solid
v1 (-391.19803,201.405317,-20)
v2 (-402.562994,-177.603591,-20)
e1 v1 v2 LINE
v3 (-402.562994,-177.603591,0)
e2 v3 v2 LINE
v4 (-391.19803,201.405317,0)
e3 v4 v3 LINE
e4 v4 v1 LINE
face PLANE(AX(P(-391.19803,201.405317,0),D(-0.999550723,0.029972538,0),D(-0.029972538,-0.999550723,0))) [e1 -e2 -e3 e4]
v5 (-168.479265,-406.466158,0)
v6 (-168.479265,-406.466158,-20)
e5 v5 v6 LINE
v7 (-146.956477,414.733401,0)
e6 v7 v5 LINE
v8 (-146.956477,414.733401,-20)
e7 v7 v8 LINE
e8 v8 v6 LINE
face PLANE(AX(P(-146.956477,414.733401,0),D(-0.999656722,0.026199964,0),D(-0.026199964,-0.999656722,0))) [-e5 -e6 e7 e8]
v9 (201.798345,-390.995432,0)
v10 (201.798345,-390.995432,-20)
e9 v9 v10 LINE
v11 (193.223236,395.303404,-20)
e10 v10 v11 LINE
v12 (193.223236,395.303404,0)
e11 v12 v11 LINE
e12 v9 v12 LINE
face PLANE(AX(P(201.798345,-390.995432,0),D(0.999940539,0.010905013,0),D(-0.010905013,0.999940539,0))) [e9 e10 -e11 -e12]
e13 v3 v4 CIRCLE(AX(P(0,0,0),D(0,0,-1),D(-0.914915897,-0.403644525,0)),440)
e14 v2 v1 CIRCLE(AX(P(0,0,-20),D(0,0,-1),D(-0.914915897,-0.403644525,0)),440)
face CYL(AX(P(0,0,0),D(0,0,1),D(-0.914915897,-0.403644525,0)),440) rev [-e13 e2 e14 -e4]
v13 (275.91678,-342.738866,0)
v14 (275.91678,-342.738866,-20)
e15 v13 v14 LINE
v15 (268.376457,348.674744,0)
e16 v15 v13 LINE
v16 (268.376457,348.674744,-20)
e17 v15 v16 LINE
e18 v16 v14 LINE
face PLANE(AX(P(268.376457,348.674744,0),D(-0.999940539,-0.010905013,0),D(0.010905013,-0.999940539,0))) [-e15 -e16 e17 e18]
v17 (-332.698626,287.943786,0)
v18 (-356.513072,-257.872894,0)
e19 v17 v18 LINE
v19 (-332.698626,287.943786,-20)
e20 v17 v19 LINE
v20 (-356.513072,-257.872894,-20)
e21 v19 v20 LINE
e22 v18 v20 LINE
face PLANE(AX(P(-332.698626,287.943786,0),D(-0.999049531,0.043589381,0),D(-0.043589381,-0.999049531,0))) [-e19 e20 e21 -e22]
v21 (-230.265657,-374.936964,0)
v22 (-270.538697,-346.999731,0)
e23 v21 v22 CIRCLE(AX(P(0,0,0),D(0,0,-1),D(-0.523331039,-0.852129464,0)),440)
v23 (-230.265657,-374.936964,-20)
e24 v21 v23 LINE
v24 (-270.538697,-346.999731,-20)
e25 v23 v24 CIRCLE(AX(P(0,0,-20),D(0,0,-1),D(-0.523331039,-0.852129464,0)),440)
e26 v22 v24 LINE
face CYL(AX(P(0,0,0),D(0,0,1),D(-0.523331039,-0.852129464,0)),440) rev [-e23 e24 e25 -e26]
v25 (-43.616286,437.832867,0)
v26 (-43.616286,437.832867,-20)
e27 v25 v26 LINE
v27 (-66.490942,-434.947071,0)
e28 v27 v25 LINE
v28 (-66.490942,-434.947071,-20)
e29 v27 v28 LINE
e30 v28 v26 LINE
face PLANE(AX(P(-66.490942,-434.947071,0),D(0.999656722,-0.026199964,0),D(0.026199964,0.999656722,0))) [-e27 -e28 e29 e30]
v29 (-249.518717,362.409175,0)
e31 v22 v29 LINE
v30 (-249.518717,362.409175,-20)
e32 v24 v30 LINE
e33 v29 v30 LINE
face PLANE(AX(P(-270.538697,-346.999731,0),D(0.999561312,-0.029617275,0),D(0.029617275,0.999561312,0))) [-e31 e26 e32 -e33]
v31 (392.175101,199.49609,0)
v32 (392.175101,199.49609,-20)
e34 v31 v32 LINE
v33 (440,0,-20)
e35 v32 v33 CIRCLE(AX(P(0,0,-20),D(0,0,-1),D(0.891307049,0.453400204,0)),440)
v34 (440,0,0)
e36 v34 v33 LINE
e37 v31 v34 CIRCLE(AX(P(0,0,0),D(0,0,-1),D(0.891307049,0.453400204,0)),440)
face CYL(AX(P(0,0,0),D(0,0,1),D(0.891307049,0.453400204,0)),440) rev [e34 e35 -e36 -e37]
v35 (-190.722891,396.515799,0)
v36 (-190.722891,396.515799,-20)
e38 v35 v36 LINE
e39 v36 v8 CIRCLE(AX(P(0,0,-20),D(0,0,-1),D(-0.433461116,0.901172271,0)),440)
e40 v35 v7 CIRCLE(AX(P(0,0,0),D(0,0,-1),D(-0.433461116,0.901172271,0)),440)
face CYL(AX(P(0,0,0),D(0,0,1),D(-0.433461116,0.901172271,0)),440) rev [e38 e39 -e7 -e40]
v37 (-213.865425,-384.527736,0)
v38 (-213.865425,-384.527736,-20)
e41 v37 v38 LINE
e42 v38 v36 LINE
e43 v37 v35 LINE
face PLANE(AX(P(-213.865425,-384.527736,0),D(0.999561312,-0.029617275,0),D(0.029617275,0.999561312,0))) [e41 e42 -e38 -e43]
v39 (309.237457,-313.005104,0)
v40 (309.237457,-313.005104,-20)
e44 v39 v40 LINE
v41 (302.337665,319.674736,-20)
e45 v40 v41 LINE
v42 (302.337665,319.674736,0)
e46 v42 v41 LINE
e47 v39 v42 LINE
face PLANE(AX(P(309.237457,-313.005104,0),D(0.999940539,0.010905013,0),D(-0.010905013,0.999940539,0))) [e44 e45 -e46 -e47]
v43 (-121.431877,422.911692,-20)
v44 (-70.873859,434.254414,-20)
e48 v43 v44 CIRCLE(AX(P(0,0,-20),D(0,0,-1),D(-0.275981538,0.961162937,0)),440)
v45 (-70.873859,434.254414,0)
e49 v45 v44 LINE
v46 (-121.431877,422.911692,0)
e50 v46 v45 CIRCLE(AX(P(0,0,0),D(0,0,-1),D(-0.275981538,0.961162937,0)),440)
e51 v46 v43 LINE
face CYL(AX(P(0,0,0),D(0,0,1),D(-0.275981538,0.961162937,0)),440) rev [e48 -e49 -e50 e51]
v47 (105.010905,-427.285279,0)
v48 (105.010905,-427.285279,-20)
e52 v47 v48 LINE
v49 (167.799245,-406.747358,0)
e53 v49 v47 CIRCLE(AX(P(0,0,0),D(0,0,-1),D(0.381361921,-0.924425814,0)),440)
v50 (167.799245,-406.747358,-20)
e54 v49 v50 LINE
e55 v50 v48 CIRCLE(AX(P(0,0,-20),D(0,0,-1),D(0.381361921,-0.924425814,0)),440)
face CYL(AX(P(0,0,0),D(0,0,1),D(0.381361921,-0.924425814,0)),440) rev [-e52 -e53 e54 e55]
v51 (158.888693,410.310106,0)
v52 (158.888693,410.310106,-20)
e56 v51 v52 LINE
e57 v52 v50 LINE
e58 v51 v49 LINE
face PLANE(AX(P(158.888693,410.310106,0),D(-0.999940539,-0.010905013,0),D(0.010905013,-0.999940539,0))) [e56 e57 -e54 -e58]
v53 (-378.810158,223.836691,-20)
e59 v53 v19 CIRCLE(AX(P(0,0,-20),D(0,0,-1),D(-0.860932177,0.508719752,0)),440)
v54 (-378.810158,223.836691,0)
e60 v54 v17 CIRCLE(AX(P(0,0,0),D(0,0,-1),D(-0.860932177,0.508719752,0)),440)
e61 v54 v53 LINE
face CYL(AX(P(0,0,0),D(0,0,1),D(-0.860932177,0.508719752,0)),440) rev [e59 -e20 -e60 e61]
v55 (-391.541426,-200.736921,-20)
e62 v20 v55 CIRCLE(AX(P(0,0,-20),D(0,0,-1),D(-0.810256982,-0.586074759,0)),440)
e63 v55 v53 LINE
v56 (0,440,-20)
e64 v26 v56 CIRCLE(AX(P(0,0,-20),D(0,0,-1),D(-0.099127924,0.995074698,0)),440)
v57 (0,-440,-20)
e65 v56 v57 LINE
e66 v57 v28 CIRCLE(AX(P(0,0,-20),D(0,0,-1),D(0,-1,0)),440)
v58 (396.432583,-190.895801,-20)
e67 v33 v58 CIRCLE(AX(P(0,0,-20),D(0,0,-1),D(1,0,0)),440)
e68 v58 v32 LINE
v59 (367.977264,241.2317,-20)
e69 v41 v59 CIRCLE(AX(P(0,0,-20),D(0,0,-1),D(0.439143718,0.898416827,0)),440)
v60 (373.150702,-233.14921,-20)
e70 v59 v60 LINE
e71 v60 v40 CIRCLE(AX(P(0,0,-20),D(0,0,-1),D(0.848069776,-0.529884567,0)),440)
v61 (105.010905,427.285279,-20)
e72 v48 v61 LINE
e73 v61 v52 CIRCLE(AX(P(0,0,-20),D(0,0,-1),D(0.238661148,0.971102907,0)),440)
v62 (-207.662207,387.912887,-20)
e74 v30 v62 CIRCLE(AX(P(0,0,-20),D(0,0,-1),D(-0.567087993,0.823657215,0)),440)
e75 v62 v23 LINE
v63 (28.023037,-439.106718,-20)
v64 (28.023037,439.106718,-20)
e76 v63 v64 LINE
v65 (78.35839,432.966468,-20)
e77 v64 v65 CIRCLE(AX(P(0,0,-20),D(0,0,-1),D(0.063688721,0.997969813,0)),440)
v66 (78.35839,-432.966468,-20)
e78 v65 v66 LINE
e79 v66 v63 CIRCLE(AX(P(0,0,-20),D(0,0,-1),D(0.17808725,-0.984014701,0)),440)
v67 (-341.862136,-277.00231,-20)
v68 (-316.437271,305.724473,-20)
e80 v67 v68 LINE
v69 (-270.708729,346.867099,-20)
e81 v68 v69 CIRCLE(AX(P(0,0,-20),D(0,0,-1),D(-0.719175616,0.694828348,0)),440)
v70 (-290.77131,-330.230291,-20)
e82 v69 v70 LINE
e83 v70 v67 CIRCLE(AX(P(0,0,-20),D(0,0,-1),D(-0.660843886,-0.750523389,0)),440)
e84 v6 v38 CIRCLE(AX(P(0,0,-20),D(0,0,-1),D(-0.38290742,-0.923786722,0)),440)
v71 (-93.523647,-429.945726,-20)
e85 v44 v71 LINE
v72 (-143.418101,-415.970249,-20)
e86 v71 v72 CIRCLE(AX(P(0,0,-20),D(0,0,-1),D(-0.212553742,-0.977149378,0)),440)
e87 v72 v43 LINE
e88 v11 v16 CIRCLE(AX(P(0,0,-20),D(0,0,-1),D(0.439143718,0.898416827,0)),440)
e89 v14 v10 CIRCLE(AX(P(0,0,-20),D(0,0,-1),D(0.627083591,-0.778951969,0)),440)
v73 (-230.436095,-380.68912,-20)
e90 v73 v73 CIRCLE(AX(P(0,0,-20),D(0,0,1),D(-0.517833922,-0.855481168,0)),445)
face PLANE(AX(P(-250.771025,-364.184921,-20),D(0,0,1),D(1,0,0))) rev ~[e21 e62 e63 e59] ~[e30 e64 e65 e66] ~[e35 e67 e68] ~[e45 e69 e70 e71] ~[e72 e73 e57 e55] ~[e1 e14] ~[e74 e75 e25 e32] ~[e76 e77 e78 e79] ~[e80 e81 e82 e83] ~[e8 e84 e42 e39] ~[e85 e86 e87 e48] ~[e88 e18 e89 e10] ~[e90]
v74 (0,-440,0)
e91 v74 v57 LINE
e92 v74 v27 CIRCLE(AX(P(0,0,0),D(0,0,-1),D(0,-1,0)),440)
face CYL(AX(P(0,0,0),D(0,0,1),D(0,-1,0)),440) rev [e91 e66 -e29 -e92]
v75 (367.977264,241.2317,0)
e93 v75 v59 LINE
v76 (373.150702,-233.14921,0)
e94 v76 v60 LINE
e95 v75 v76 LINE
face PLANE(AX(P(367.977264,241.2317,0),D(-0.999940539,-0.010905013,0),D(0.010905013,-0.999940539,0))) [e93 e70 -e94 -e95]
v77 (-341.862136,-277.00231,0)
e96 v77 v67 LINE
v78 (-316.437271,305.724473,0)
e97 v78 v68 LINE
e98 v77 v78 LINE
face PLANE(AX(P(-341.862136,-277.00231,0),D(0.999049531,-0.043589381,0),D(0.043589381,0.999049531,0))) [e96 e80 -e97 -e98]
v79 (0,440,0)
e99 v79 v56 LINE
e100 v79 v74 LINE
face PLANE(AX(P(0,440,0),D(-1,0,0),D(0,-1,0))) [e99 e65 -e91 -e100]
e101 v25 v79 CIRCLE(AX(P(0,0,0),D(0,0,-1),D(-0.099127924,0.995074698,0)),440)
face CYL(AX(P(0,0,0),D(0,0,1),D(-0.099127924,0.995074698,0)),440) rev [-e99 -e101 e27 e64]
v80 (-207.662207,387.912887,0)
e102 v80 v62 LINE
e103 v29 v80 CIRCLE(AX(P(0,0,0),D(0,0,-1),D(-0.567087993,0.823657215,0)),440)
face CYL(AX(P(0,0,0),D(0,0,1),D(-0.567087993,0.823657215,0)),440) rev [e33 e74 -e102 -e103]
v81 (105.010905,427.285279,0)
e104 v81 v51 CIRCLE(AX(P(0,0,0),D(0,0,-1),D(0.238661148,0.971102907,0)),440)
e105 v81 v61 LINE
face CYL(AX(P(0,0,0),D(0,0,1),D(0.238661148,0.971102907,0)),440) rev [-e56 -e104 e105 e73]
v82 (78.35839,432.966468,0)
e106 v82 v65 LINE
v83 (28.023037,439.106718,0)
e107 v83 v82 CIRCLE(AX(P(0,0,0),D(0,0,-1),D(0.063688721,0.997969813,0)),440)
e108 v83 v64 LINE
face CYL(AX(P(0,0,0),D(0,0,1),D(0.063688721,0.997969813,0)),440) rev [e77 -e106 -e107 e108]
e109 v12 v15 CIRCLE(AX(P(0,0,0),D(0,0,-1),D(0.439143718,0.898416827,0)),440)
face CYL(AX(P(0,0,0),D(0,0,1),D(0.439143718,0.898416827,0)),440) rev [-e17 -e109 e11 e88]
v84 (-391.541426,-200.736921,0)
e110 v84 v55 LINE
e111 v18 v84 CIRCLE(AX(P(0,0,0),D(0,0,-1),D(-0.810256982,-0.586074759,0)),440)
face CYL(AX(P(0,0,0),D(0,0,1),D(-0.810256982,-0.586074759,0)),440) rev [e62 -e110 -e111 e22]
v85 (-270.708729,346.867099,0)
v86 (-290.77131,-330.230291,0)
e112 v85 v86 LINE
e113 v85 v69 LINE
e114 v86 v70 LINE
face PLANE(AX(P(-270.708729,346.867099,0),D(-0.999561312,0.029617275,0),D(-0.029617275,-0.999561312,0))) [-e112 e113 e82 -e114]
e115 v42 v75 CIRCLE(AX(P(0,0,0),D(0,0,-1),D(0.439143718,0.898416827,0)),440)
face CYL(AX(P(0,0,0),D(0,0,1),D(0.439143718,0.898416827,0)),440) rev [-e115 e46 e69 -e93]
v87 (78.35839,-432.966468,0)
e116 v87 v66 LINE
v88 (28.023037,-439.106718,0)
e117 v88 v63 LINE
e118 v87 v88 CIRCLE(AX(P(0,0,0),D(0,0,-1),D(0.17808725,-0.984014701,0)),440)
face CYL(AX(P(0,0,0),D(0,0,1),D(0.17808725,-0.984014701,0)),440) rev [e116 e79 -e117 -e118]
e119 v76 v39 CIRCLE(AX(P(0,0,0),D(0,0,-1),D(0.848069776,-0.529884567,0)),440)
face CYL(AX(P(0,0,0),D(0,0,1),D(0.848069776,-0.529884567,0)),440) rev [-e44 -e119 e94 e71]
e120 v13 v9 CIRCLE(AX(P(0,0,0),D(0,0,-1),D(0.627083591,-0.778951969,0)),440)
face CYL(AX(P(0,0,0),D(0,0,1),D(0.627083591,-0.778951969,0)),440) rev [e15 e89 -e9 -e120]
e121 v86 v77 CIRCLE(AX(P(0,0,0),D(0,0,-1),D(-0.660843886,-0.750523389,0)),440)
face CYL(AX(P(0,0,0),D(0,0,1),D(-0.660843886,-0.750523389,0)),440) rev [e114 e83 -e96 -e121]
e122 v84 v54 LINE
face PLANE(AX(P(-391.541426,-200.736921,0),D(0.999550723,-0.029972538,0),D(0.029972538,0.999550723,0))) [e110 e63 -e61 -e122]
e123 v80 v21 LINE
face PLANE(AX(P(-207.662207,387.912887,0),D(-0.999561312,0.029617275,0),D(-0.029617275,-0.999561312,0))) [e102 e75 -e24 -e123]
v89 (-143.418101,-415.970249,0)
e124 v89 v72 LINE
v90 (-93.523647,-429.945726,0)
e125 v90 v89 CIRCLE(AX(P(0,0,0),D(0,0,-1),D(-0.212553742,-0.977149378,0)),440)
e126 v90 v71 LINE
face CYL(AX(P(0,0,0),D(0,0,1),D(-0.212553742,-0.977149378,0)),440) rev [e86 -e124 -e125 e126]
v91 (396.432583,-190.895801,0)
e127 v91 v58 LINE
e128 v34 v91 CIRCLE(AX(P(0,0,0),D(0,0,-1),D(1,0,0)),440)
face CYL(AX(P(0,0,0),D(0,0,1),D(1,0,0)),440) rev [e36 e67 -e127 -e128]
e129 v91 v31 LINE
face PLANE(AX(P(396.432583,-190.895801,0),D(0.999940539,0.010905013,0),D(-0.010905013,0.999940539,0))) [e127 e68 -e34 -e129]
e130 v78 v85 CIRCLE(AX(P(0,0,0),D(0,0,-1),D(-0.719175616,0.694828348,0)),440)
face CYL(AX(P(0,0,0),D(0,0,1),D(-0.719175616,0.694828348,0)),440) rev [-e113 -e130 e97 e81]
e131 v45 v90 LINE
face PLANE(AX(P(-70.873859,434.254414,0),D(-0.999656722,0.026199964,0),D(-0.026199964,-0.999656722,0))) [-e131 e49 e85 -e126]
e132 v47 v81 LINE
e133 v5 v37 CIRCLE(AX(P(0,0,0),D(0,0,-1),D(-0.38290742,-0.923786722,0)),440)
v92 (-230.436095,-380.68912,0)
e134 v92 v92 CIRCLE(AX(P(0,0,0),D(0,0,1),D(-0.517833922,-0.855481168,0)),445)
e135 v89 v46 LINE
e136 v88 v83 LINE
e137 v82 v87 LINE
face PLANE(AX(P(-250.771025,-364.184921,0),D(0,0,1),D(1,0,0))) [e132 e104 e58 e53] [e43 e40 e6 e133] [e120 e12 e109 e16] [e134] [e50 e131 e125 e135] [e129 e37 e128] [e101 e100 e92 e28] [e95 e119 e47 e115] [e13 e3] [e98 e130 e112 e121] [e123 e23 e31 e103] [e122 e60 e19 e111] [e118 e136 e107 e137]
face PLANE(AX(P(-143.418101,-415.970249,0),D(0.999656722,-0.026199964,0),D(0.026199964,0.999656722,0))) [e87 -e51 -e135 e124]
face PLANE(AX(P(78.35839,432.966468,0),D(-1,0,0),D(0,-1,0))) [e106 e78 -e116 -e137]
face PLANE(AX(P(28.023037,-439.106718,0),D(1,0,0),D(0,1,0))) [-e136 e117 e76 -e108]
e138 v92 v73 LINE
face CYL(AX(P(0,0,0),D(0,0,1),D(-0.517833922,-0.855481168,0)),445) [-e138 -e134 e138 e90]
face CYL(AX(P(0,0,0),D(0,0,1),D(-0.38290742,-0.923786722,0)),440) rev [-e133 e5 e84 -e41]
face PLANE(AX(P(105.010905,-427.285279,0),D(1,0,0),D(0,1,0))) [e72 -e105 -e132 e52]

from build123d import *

# Parameters (mm, degrees)
F1_DEPTH = 20


with BuildPart() as f1:
    # F0 (on Top) → F1 (new body)
    with BuildSketch(Plane.XY):
        with BuildLine():
            Line((-270.5386970375, -346.9997311313), (-270.7217620056, -353.178039488))
            ThreePointArc((-270.7217620056, -353.178039488), (-250.9562000988, -367.4860346081), (-230.4360952891, -380.6891198707))
            Line((-230.4360952891, -380.6891198707), (-230.265657339, -374.9369641023))
            ThreePointArc((-230.2656573389, -374.9369641023), (-250.7914922543, -361.5295664436), (-270.5386970375, -346.9997311313))
        make_face()
        with BuildLine():
            ThreePointArc((-402.562994487, -177.6035908131), (-397.2206510106, -189.250507029), (-391.5414264828, -200.7369207392))
            Line((-391.5414264828, -200.7369207392), (-378.8101580312, 223.8366908537))
            ThreePointArc((-378.8101580312, 223.8366908537), (-385.1674232463, 212.7112034422), (-391.1980296982, 201.4053166136))
            Line((-391.1980296982, 201.4053166136), (-402.562994487, -177.6035908131))
        make_face()
        with BuildLine():
            ThreePointArc((-356.5130720875, -257.8728939433), (-349.3185745571, -267.5379103406), (-341.8621362052, -277.0023101514))
            Line((-341.8621362052, -277.0023101514), (-316.4372711676, 305.7244730407))
            ThreePointArc((-316.4372711676, 305.7244730407), (-324.6896849683, 296.9454638064), (-332.6986262228, 287.9437863707))
            Line((-332.6986262228, 287.9437863707), (-356.5130720875, -257.8728939433))
        make_face()
        with BuildLine():
            ThreePointArc((-290.771309932, -330.2302913429), (-280.7802245685, -338.7660925938), (-270.5386970375, -346.9997311313))
            Line((-270.5386970375, -346.9997311313), (-249.5187169425, 362.4091746843))
            ThreePointArc((-249.5187169425, 362.4091746843), (-260.22977901, 354.7963671127), (-270.708728898, 346.8670986105))
            Line((-270.708728898, 346.8670986105), (-290.771309932, -330.2302913429))
        make_face()
        with BuildLine():
            Line((-207.6622074156, 387.912886627), (-230.265657339, -374.9369641023))
            ThreePointArc((-230.2656573389, -374.9369641023), (-222.1173118779, -379.8208785258), (-213.8654246951, -384.5277364768))
            Line((-213.8654246951, -384.5277364768), (-190.7228909108, 396.5157990328))
            ThreePointArc((-190.7228909108, 396.5157990328), (-199.2389875692, 392.3057810336), (-207.6622074156, 387.912886627))
        make_face()
        with BuildLine():
            Line((-70.8738586956, 434.2544140865), (-70.7405367429, 439.341298379))
            ThreePointArc((-70.7405367429, 439.341298379), (-431.4752027521, 108.8767624889), (-270.7217620056, -353.178039488))
            Line((-270.7217620056, -353.178039488), (-270.5386970375, -346.9997311313))
            ThreePointArc((-270.5386970375, -346.9997311313), (-280.7802245685, -338.7660925938), (-290.771309932, -330.2302913429))
            ThreePointArc((-290.771309932, -330.2302913429), (-317.4343613856, -304.6890648049), (-341.8621362052, -277.0023101514))
            ThreePointArc((-341.8621362052, -277.0023101514), (-349.3185745571, -267.5379103406), (-356.5130720875, -257.8728939433))
            ThreePointArc((-356.5130720875, -257.8728939433), (-375.1166659405, -229.9727960731), (-391.5414264828, -200.7369207392))
            ThreePointArc((-391.5414264828, -200.7369207392), (-397.2206510106, -189.250507029), (-402.562994487, -177.6035908131))
            ThreePointArc((-402.562994487, -177.6035908131), (-439.8023179294, 13.187916588), (-391.1980296982, 201.4053166136))
            ThreePointArc((-391.1980296982, 201.4053166136), (-385.1674232463, 212.7112034422), (-378.8101580312, 223.8366908537))
            ThreePointArc((-378.8101580312, 223.8366908537), (-357.1954891114, 256.9268038926), (-332.6986262228, 287.9437863707))
            ThreePointArc((-332.6986262228, 287.9437863707), (-324.6896849683, 296.9454638064), (-316.4372711676, 305.7244730407))
            ThreePointArc((-316.4372711676, 305.7244730407), (-294.2928562808, 327.0958800445), (-270.708728898, 346.8670986105))
            ThreePointArc((-270.708728898, 346.8670986105), (-260.22977901, 354.7963671127), (-249.5187169425, 362.4091746843))
            ThreePointArc((-249.5187169425, 362.4091746843), (-228.9458652825, 375.7443156856), (-207.6622074156, 387.912886627))
            ThreePointArc((-207.6622074156, 387.912886627), (-199.2389875692, 392.3057810336), (-190.7228909108, 396.5157990328))
            ThreePointArc((-190.7228909108, 396.5157990328), (-169.0852127848, 406.2144640673), (-146.9564772982, 414.7334008494))
            ThreePointArc((-146.9564772982, 414.7334008494), (-134.2564645291, 419.0169468317), (-121.4318768159, 422.9116920741))
            ThreePointArc((-121.4318768159, 422.9116920741), (-96.3199787859, 429.3279185968), (-70.8738586956, 434.2544140865))
        make_face()
        with BuildLine():
            Line((-143.4181009985, -415.9702493039), (-121.4318768159, 422.9116920741))
            ThreePointArc((-121.4318768159, 422.9116920741), (-134.2564645291, 419.0169468317), (-146.9564772982, 414.7334008494))
            Line((-146.9564772982, 414.7334008494), (-168.4792645982, -406.4661577554))
            ThreePointArc((-168.4792645982, -406.4661577554), (-156.0210678261, -411.4090742733), (-143.4181009985, -415.9702493039))
        make_face()
        with BuildLine():
            ThreePointArc((-43.616286433, 437.8328671511), (-57.2730273731, 436.2565762662), (-70.8738586956, 434.2544140865))
            Line((-70.8738586956, 434.2544140865), (-93.5236465706, -429.9457262634))
            ThreePointArc((-93.5236465706, -429.9457262634), (-80.0463646466, -432.6575776603), (-66.4909418972, -434.9470710852))
            Line((-66.4909418972, -434.9470710852), (-43.616286433, 437.8328671511))
        make_face()
        with BuildLine():
            Line((0, 440), (0, -440))
            ThreePointArc((0, -440), (14.0186355194, -439.7766226827), (28.0230371971, -439.1067175372))
            Line((28.0230371971, -439.1067175372), (28.0230371971, 439.1067175372))
            ThreePointArc((28.0230371971, 439.1067175372), (14.0186355194, 439.7766226827), (0, 440))
        make_face()
        with BuildLine():
            Line((78.35839003, 432.9664683459), (78.35839003, -432.9664683459))
            ThreePointArc((78.35839003, -432.9664683459), (91.7286409393, -430.3322628289), (105.0109050122, -427.2852792088))
            Line((105.0109050122, -427.2852792088), (105.0109050122, 427.2852792088))
            ThreePointArc((105.0109050122, 427.2852792088), (91.7286409393, 430.3322628289), (78.35839003, 432.9664683459))
        make_face()
        with BuildLine():
            Line((158.8886932936, 410.3101060704), (167.7992454591, -406.7473579796))
            ThreePointArc((167.7992454591, -406.7473579796), (184.9665523772, -399.233483693), (201.798344937, -390.9954321737))
            Line((201.798344937, -390.9954321737), (193.2232359584, 395.3034038378))
            ThreePointArc((193.2232359584, 395.3034038378), (176.2157852134, 403.1724160228), (158.8886932936, 410.3101060704))
        make_face()
        with BuildLine():
            Line((268.376457209, 348.6747441613), (275.9167800325, -342.7388663348))
            ThreePointArc((275.9167800325, -342.7388663348), (292.9545944223, -328.2949978402), (309.2374568684, -313.0051042228))
            Line((309.2374568684, -313.0051042228), (302.3376646701, 319.6747355075))
            ThreePointArc((302.3376646701, 319.6747355075), (285.7252217666, 334.6058840583), (268.376457209, 348.6747441613))
        make_face()
        with BuildLine():
            Line((367.9772639554, 241.2317002633), (373.1507016006, -233.1492095096))
            ThreePointArc((373.1507016006, -233.1492095096), (385.3711791661, -212.3418335329), (396.4325833067, -190.8958011398))
            Line((396.4325833067, -190.8958011398), (392.175101476, 199.4960896417))
            ThreePointArc((392.175101476, 199.4960896417), (380.6486174495, 220.6957861714), (367.9772639554, 241.2317002633))
        make_face()
        with BuildLine():
            ThreePointArc((0, -445), (314.662517628, -314.662517628), (445, 0))
            ThreePointArc((445, 0), (288.570148447, 338.7510434306), (-70.7405367429, 439.341298379))
            Line((-70.7405367429, 439.341298379), (-70.8738586956, 434.2544140865))
            ThreePointArc((-70.8738586956, 434.2544140865), (-57.2730273731, 436.2565762662), (-43.616286433, 437.8328671511))
            ThreePointArc((-43.616286433, 437.8328671511), (-21.835045838, 439.4578828207), (0, 440))
            ThreePointArc((0, 440), (14.0186355194, 439.7766226827), (28.0230371971, 439.1067175372))
            ThreePointArc((28.0230371971, 439.1067175372), (53.2792424848, 436.7623178804), (78.35839003, 432.9664683459))
            ThreePointArc((78.35839003, 432.9664683459), (91.7286409393, 430.3322628289), (105.0109050122, 427.2852792088))
            ThreePointArc((105.0109050122, 427.2852792088), (132.2224966571, 419.663211847), (158.8886932936, 410.3101060704))
            ThreePointArc((158.8886932936, 410.3101060704), (176.2157852134, 403.1724160228), (193.2232359584, 395.3034038378))
            ThreePointArc((193.2232359584, 395.3034038378), (231.9744105691, 373.8821643795), (268.376457209, 348.6747441613))
            ThreePointArc((268.376457209, 348.6747441613), (285.7252217666, 334.6058840583), (302.3376646701, 319.6747355075))
            ThreePointArc((302.3376646701, 319.6747355075), (337.4445929766, 282.3670424658), (367.9772639554, 241.2317002633))
            ThreePointArc((367.9772639554, 241.2317002633), (380.6486174495, 220.6957861714), (392.175101476, 199.4960896417))
            ThreePointArc((392.175101476, 199.4960896417), (427.8767606738, 102.5742544467), (440, 0))
            ThreePointArc((440, 0), (428.969892099, -97.9021535643), (396.4325833067, -190.8958011398))
            ThreePointArc((396.4325833067, -190.8958011398), (385.3711791661, -212.3418335329), (373.1507016006, -233.1492095096))
            ThreePointArc((373.1507016006, -233.1492095096), (343.5224020131, -274.9406468952), (309.2374568684, -313.0051042228))
            ThreePointArc((309.2374568684, -313.0051042228), (292.9545944223, -328.2949978402), (275.9167800325, -342.7388663348))
            ThreePointArc((275.9167800325, -342.7388663348), (240.0731330091, -368.7341736362), (201.798344937, -390.9954321737))
            ThreePointArc((201.798344937, -390.9954321737), (184.9665523772, -399.233483693), (167.7992454591, -406.7473579796))
            ThreePointArc((167.7992454591, -406.7473579796), (136.7910673332, -418.1963700199), (105.0109050122, -427.2852792088))
            ThreePointArc((105.0109050122, -427.2852792088), (91.7286409393, -430.3322628289), (78.35839003, -432.9664683459))
            ThreePointArc((78.35839003, -432.9664683459), (53.2792424848, -436.7623178804), (28.0230371971, -439.1067175372))
            ThreePointArc((28.0230371971, -439.1067175372), (14.0186355194, -439.7766226827), (0, -440))
            Line((0, -440), (0, -445))
        make_face()
        with BuildLine():
            ThreePointArc((-230.4360952891, -380.6891198707), (-119.6209464466, -428.6208454698), (0, -445))
            Line((0, -445), (0, -440))
            ThreePointArc((0, -440), (-33.3413311259, -438.7349491877), (-66.4909418972, -434.9470710852))
            ThreePointArc((-66.4909418972, -434.9470710852), (-80.0463646466, -432.6575776603), (-93.5236465706, -429.9457262634))
            ThreePointArc((-93.5236465706, -429.9457262634), (-118.6767728932, -423.693077092), (-143.4181009985, -415.9702493039))
            ThreePointArc((-143.4181009985, -415.9702493039), (-156.0210678261, -411.4090742733), (-168.4792645982, -406.4661577554))
            ThreePointArc((-168.4792645982, -406.4661577554), (-191.4867852876, -396.1474612568), (-213.8654246951, -384.5277364768))
            ThreePointArc((-213.8654246951, -384.5277364768), (-222.1173118779, -379.8208785258), (-230.2656573389, -374.9369641023))
            Line((-230.265657339, -374.9369641023), (-230.4360952891, -380.6891198707))
        make_face()
    extrude(amount=-F1_DEPTH)


solid = f1.part
